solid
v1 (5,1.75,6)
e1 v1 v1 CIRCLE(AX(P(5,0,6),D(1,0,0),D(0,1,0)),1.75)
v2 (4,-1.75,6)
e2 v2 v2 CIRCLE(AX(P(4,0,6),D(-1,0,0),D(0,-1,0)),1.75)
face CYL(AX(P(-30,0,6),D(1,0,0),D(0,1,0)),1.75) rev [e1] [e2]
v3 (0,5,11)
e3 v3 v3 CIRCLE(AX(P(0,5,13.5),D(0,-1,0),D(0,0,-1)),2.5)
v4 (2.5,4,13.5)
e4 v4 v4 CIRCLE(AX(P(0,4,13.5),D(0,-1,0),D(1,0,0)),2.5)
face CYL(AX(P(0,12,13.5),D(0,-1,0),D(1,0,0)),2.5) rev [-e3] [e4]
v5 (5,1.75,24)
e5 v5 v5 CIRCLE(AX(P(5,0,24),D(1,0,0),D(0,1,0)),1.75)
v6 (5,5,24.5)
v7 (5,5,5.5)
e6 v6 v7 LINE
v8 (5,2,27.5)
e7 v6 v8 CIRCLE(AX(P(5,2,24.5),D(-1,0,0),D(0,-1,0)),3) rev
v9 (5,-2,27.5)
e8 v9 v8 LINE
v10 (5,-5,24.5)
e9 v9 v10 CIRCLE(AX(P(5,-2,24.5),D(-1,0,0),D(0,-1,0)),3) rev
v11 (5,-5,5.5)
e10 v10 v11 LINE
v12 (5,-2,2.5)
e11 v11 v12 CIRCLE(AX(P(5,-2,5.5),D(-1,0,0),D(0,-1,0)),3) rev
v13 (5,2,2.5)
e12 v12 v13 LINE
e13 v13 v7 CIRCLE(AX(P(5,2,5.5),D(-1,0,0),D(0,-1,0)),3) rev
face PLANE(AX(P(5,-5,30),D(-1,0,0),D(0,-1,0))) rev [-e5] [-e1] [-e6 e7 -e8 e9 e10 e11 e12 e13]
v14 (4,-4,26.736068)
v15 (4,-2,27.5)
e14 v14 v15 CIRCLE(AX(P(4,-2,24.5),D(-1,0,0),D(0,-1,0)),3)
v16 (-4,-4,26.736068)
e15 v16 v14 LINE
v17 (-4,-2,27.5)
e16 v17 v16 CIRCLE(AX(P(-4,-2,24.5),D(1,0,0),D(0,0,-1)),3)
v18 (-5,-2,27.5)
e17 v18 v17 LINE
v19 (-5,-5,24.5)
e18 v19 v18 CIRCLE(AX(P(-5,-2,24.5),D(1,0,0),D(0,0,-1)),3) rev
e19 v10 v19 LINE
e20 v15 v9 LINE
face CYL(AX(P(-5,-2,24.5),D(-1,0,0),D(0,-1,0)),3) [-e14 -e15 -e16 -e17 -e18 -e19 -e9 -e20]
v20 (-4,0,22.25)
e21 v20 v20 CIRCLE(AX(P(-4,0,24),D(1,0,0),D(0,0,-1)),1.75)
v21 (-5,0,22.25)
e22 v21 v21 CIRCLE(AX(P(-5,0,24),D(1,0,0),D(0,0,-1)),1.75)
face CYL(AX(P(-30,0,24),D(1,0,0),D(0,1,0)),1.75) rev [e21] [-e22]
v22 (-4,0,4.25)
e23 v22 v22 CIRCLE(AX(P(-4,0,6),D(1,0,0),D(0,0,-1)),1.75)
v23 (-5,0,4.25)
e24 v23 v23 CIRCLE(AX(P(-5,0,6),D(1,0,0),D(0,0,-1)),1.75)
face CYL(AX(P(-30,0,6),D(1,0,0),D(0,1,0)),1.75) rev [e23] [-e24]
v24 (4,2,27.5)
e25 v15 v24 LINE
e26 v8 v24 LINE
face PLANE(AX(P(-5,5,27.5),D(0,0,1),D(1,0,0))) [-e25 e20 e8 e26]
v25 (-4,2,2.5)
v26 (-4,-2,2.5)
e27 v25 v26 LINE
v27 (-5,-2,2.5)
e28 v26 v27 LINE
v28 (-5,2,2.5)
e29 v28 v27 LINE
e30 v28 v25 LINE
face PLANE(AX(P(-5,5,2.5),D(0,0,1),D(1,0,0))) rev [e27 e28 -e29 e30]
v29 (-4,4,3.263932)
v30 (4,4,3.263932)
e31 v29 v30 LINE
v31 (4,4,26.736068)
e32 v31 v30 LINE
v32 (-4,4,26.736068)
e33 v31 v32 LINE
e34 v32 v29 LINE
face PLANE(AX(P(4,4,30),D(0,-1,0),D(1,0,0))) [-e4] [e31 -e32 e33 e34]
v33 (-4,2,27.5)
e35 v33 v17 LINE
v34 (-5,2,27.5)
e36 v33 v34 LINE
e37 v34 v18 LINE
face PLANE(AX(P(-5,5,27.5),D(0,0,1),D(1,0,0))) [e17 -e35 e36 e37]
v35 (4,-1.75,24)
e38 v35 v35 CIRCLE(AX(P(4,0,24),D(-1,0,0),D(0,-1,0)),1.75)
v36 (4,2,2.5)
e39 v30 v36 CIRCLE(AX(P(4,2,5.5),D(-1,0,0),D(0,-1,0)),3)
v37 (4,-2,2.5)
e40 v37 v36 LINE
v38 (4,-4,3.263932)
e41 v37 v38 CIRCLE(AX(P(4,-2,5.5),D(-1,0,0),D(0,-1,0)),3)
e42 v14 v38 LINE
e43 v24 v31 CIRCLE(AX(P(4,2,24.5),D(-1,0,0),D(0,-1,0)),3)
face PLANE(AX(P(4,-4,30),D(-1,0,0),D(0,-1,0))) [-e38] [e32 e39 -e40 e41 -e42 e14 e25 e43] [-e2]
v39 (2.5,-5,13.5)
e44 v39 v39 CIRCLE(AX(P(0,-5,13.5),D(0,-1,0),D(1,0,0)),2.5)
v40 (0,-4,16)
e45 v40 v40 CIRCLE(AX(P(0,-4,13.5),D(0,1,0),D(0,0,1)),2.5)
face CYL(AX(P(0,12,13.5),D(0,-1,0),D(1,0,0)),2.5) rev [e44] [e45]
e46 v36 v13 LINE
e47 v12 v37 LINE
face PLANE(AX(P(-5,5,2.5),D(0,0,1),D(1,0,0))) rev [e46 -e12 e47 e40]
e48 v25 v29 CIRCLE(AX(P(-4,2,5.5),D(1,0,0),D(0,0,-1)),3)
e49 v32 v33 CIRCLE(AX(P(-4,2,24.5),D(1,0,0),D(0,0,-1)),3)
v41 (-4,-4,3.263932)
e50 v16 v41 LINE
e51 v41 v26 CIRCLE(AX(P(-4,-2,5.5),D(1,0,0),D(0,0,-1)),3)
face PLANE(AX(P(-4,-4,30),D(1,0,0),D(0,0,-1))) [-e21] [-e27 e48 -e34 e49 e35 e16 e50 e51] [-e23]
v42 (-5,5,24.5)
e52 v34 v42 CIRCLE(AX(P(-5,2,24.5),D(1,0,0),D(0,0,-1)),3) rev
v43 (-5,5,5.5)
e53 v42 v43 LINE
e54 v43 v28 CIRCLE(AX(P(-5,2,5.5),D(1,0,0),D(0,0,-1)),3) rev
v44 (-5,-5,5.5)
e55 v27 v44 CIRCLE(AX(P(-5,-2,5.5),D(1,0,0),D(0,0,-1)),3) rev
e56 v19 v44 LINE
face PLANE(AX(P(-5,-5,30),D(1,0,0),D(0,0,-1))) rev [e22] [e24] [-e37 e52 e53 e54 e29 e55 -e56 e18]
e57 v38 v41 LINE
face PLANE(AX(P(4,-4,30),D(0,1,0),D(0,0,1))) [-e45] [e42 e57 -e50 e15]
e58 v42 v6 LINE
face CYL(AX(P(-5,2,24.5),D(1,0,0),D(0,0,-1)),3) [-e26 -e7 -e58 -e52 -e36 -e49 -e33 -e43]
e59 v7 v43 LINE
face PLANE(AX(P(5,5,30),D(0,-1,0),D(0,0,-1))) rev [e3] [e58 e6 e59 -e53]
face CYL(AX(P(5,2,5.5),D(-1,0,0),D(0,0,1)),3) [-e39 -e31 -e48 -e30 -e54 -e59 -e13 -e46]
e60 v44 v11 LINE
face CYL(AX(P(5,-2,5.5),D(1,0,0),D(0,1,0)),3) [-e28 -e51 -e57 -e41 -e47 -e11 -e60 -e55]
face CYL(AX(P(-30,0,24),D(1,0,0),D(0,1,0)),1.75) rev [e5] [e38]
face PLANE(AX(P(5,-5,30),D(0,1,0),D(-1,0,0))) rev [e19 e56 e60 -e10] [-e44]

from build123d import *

# Parameters (mm, degrees)
SKIZZE1_W                       = 10
SKIZZE1_H                       = 10
SKIZZE1_W_2                     = 8
SKIZZE1_H_2                     = 8
AUFSATZ_LINEAR_AUSTRAGEN1_DEPTH = 30
SKIZZE2_R                       = 1.75
SCHNITT_LINEAR_AUSTRAGEN1_DEPTH = 35
SKIZZE3_R                       = 2.5
SCHNITT_LINEAR_AUSTRAGEN2_DEPTH = 17
FL_CHE_START                    = 27.5
FL_CHE_VERSCHIEBEN1_OUTLINE_W   = 10
FL_CHE_VERSCHIEBEN1_OUTLINE_H   = 10
FL_CHE_VERSCHIEBEN1_OUTLINE_W_2 = 8
FL_CHE_VERSCHIEBEN1_OUTLINE_H_2 = 8
FL_CHE_VERSCHIEBEN1_DEPTH       = 2.5
FL_CHE_VERSCHIEBEN2_OUTLINE_W   = 10
FL_CHE_VERSCHIEBEN2_OUTLINE_H   = 10
FL_CHE_VERSCHIEBEN2_OUTLINE_W_2 = 8
FL_CHE_VERSCHIEBEN2_OUTLINE_H_2 = 8
FL_CHE_VERSCHIEBEN2_DEPTH       = 2.5
VERRUNDUNG1_R                   = 3


# Read off the part's stored shape, not the designer's step: Fläche verschieben1, Fläche verschieben2
with BuildPart() as part:
    # Skizze1 → Aufsatz-Linear austragen1 (new body)
    with BuildSketch(Plane.XY):
        Rectangle(SKIZZE1_W, SKIZZE1_H)
        Rectangle(SKIZZE1_W_2, SKIZZE1_H_2, mode=Mode.SUBTRACT)
    extrude(amount=AUFSATZ_LINEAR_AUSTRAGEN1_DEPTH)

    # Skizze2 → Schnitt-Linear austragen1 (cut)
    with BuildSketch(Plane(origin=(5, 0, 0), x_dir=(0, 0, -1), z_dir=(1, 0, 0))):
        with Locations(Location((-6, 0, 0), (0, 0, 90))):
            Circle(SKIZZE2_R)
        with Locations(Location((-24, 0, 0), (0, 0, 90))):
            Circle(SKIZZE2_R)
    extrude(amount=-SCHNITT_LINEAR_AUSTRAGEN1_DEPTH, mode=Mode.SUBTRACT)

    # Skizze3 → Schnitt-Linear austragen2 (cut)
    with BuildSketch(Plane.XZ.offset(5)):
        with Locations((0, 13.5)):
            Circle(SKIZZE3_R)
    extrude(amount=-SCHNITT_LINEAR_AUSTRAGEN2_DEPTH, mode=Mode.SUBTRACT)

    # Fläche verschieben1 outline → Fläche verschieben1 (cut)
    with BuildSketch(Plane.XY.offset(FL_CHE_START)):
        Rectangle(FL_CHE_VERSCHIEBEN1_OUTLINE_W, FL_CHE_VERSCHIEBEN1_OUTLINE_H)
        Rectangle(FL_CHE_VERSCHIEBEN1_OUTLINE_W_2, FL_CHE_VERSCHIEBEN1_OUTLINE_H_2, mode=Mode.SUBTRACT)
    extrude(amount=FL_CHE_VERSCHIEBEN1_DEPTH, mode=Mode.SUBTRACT)

    # Fläche verschieben2 outline → Fläche verschieben2 (cut)
    with BuildSketch(Plane.XY):
        Rectangle(FL_CHE_VERSCHIEBEN2_OUTLINE_W, FL_CHE_VERSCHIEBEN2_OUTLINE_H)
        Rectangle(FL_CHE_VERSCHIEBEN2_OUTLINE_W_2, FL_CHE_VERSCHIEBEN2_OUTLINE_H_2, mode=Mode.SUBTRACT)
    extrude(amount=FL_CHE_VERSCHIEBEN2_DEPTH, mode=Mode.SUBTRACT)

    # Verrundung1
    # the kernel refuses this fillet: 3 mm, written as the material it takes off along each edge
    with BuildSketch(Plane(origin=(-12.5, -5, 2.5), x_dir=(0, 0, 1), z_dir=(1, 0, 0)), Plane(origin=(12.5, 5, 27.5), x_dir=(0, -1, 0), z_dir=(-1, 0, 0))) as verrundung1_piece_1:
        with BuildLine():
            CenterArc((VERRUNDUNG1_R, -VERRUNDUNG1_R), VERRUNDUNG1_R, 90, 90)
            Line((0, -VERRUNDUNG1_R), (0, 0))
            Line((0, 0), (VERRUNDUNG1_R, 0))
        make_face()
    extrude(amount=25, mode=Mode.SUBTRACT)
    with BuildSketch(Plane(origin=(12.5, 5, 2.5), x_dir=(0, -1, 0), z_dir=(-1, 0, 0)), Plane(origin=(-12.5, -5, 27.5), x_dir=(0, 0, -1), z_dir=(1, 0, 0))) as verrundung1_piece_2:
        with BuildLine():
            CenterArc((VERRUNDUNG1_R, VERRUNDUNG1_R), VERRUNDUNG1_R, 180, 90)
            Line((0, VERRUNDUNG1_R), (0, 0))
            Line((0, 0), (VERRUNDUNG1_R, 0))
        make_face()
    extrude(amount=25, mode=Mode.SUBTRACT)


solid = part.part
